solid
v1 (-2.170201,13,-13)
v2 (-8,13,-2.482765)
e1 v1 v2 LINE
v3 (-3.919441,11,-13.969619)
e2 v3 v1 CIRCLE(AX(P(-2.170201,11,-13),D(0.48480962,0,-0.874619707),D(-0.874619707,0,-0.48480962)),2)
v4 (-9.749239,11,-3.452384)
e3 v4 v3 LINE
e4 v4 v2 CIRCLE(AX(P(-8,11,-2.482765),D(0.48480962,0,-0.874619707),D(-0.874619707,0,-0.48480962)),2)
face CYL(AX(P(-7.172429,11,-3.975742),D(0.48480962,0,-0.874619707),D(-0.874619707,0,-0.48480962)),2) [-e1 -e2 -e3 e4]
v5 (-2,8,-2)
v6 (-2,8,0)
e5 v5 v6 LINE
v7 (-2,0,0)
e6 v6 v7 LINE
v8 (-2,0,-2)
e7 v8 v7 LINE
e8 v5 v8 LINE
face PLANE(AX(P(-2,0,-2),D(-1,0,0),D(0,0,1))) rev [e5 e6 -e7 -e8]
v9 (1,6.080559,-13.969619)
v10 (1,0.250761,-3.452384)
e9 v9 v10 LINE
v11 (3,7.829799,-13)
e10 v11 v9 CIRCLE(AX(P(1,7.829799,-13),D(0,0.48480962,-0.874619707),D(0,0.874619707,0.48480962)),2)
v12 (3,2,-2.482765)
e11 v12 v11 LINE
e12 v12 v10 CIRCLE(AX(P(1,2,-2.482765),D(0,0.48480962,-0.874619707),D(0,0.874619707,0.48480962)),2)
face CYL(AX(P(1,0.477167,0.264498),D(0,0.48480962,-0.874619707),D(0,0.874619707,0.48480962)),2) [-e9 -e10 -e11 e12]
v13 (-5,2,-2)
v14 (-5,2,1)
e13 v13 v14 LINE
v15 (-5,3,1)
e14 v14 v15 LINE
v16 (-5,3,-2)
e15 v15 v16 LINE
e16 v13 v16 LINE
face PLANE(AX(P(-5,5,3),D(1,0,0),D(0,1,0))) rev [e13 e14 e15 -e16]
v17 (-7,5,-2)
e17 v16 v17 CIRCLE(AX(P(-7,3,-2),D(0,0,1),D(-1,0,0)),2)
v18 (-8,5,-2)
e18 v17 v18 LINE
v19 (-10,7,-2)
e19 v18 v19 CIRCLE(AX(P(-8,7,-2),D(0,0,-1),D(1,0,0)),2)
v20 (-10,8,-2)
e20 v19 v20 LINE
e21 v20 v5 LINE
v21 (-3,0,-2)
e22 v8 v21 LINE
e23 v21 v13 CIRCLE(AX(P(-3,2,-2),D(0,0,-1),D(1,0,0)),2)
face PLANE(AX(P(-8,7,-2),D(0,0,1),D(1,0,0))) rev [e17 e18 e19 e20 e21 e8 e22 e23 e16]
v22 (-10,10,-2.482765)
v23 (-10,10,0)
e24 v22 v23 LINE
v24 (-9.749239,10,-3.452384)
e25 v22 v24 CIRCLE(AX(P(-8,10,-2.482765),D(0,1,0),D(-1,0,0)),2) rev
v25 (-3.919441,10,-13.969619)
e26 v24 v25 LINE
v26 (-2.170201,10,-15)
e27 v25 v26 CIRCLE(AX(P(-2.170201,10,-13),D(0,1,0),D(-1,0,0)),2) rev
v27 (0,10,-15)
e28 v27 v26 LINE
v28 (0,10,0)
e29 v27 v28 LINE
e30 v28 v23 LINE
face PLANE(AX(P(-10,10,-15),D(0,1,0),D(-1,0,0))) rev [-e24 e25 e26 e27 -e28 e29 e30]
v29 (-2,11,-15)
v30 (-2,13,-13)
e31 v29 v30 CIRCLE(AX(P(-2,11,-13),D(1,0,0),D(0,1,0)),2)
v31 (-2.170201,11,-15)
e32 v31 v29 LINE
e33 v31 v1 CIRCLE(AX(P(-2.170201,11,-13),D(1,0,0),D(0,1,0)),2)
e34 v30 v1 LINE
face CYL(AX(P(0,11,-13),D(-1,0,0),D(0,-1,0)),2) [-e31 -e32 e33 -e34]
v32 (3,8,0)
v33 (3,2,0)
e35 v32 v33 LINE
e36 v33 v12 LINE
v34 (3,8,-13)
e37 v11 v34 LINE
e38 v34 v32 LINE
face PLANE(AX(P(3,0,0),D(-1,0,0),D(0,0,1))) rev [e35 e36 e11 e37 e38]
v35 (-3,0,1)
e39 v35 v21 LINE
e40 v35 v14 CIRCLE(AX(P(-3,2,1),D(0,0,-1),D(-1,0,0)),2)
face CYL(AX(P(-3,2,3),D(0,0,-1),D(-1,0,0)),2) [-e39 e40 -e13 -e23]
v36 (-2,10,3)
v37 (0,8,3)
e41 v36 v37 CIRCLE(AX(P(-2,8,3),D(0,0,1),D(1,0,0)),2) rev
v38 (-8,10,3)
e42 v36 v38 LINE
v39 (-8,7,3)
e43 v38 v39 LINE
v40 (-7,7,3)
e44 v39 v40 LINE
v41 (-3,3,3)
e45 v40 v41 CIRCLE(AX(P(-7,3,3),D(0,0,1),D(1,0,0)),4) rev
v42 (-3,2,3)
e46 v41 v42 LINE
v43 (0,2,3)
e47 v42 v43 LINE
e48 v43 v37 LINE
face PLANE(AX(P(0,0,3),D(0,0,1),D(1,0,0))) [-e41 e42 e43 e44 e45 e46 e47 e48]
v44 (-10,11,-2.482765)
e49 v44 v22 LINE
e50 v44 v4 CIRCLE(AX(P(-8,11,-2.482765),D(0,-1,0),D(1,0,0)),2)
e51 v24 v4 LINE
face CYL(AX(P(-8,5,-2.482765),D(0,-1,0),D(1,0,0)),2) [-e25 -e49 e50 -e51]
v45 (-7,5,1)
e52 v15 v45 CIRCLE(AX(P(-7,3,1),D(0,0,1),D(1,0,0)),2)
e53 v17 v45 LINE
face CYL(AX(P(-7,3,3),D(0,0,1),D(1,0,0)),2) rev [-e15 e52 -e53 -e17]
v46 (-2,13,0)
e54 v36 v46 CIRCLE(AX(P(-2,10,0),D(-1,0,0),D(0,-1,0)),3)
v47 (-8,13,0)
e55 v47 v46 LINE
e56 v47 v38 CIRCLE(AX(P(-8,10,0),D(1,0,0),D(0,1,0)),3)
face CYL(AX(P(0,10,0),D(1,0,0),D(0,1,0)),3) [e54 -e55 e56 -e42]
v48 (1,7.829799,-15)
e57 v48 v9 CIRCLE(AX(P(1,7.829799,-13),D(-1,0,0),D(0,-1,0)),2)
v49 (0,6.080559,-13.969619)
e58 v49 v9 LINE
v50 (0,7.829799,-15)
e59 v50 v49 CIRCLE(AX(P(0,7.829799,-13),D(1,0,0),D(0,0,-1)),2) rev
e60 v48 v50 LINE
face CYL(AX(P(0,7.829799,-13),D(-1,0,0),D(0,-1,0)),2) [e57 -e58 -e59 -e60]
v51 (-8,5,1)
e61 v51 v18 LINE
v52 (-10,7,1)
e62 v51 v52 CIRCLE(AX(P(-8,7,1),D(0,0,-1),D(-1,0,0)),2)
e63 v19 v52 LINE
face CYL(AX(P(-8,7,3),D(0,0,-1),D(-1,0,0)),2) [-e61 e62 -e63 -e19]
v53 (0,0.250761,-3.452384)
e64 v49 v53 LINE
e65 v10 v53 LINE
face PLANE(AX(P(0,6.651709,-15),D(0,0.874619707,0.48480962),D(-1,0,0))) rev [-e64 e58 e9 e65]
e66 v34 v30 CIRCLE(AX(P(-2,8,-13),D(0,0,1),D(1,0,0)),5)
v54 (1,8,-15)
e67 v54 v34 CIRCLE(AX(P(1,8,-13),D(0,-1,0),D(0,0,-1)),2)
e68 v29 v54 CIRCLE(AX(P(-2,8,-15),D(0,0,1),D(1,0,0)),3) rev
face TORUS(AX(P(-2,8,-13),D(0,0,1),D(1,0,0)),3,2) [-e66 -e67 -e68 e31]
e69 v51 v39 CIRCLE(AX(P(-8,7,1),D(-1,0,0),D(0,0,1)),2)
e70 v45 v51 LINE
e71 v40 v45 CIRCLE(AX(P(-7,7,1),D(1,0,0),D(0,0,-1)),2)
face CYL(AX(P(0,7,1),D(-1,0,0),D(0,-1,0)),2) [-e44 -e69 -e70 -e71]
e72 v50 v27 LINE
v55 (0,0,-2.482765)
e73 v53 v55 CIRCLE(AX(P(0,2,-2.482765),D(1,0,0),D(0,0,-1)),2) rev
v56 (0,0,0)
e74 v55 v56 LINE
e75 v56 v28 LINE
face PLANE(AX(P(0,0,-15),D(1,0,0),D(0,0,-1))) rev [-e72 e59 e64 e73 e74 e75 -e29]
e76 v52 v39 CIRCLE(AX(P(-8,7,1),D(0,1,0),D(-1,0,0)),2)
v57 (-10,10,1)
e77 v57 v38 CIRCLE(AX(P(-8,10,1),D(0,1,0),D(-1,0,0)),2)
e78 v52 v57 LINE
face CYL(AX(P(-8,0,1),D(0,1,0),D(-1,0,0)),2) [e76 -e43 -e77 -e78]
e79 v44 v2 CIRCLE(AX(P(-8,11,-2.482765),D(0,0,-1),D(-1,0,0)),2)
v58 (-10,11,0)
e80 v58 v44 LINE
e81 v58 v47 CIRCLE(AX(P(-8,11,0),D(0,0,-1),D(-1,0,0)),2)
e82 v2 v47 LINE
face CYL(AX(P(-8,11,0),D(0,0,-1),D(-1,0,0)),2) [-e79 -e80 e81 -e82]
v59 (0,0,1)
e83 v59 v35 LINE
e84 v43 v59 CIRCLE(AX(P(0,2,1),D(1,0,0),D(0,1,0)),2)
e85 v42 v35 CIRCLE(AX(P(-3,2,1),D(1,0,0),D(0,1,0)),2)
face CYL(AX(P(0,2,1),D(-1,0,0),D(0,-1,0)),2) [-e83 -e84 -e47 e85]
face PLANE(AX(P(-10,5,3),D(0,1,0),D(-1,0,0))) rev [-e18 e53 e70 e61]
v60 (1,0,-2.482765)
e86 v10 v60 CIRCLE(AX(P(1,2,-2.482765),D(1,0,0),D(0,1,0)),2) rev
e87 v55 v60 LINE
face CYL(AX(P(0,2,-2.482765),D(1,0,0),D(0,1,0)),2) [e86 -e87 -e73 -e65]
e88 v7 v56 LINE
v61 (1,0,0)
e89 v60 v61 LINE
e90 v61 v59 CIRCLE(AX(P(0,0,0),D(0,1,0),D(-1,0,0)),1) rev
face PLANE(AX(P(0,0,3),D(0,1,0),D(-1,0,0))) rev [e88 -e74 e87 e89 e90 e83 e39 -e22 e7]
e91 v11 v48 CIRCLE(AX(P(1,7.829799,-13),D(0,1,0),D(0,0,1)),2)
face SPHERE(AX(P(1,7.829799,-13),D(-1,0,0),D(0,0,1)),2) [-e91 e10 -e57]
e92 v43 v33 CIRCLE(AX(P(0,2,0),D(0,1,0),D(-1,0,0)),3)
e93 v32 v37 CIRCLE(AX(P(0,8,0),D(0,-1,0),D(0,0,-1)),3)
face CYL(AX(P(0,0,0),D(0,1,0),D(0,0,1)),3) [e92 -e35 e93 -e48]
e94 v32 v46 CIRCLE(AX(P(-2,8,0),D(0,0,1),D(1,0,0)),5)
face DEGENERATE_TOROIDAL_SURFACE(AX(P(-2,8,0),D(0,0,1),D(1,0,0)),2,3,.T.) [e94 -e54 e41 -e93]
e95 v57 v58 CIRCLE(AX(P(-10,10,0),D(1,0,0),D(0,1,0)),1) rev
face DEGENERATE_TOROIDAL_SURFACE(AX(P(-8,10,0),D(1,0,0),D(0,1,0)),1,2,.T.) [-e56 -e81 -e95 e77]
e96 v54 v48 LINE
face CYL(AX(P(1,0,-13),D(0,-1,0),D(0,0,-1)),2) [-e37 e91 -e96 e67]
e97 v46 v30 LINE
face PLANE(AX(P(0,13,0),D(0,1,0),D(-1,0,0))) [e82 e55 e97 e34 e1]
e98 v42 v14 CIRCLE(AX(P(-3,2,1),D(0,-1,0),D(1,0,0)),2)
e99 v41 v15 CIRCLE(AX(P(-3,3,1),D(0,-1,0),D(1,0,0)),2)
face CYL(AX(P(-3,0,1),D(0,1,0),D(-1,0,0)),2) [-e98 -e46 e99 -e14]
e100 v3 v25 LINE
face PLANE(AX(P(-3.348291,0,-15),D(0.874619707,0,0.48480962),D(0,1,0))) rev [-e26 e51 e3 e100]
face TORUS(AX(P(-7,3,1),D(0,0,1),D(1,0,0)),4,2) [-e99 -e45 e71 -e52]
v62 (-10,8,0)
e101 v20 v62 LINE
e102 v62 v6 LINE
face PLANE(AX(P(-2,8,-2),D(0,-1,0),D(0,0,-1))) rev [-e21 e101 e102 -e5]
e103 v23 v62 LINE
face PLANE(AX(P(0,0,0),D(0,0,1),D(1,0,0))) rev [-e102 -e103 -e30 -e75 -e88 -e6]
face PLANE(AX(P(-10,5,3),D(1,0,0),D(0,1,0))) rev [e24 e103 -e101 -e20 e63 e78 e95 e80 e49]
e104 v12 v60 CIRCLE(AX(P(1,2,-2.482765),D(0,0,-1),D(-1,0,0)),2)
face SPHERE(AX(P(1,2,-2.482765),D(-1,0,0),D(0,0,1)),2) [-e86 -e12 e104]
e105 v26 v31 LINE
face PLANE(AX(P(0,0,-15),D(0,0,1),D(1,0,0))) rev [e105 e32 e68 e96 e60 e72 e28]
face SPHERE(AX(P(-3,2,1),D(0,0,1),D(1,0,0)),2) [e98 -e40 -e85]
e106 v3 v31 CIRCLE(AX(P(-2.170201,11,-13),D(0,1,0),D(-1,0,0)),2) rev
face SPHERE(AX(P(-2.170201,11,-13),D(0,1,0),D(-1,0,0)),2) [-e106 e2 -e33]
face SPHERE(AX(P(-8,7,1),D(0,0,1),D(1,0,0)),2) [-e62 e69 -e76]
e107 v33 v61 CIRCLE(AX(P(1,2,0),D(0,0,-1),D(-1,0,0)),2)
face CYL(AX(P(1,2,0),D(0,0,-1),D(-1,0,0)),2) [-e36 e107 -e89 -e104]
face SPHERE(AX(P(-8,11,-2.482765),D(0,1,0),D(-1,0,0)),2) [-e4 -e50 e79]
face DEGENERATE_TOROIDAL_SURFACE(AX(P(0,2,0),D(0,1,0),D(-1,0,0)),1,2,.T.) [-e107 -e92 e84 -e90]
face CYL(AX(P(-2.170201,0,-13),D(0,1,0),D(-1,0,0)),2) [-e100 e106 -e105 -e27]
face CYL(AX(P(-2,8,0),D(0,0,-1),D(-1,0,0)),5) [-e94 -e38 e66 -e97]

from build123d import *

# Parameters (mm, degrees)
BOSS_EXTRUDE1_DEPTH = 3
SKETCH2_W           = 10
SKETCH2_H           = 3
BOSS_EXTRUDE2_DEPTH = 3
SKETCH3_W           = 3
SKETCH3_H           = 13
BOSS_EXTRUDE3_DEPTH = 3
BOSS_EXTRUDE4_DEPTH = 15
FILLET1_R           = 3
FILLET2_R           = 2
CHAMFER1_SIZE       = 12
CHAMFER1_SIZE2      = 6.651708617
FILLET3_R           = 2
CHAMFER2_SIZE       = 12
CHAMFER2_SIZE2      = 6.651708617
FILLET4_R           = 2
FILLET5_R           = 5
FILLET7_R           = 2
BOSS_EXTRUDE5_DEPTH = 2


with BuildPart() as part:
    # Sketch1 → Boss-Extrude1 (new body)
    with BuildSketch(Plane.XY):
        Polygon((-10, 5), (-5, 5), (-5, 0), (0, 0), (0, 10), (-10, 10), align=None)
    extrude(amount=BOSS_EXTRUDE1_DEPTH)

    # Sketch2 → Boss-Extrude2 (add)
    with BuildSketch(Plane(origin=(0, 10, 0), x_dir=(1, 0, 0), z_dir=(0, 1, 0))):
        with Locations((-5, -1.5)):
            Rectangle(SKETCH2_W, SKETCH2_H)
    extrude(amount=BOSS_EXTRUDE2_DEPTH)

    # Sketch3 → Boss-Extrude3 (add)
    with BuildSketch(Plane(origin=(0, 0, 0), x_dir=(0, 0, -1), z_dir=(1, 0, 0))):
        with Locations((-1.5, 6.5)):
            Rectangle(SKETCH3_W, SKETCH3_H)
    extrude(amount=BOSS_EXTRUDE3_DEPTH)

    # Sketch4 → Boss-Extrude4 (add)
    with BuildSketch(Plane(origin=(0, 0, 0), x_dir=(-1, 0, 0), z_dir=(0, 0, -1))):
        Polygon((10, 13), (-3, 13), (-3, 9.459168036), (-3, 0), (0, 0), (0, 10), (10, 10), align=None)
    extrude(amount=BOSS_EXTRUDE4_DEPTH)

    # Fillet1
    fillet1_edges = [part.edges().sort_by_distance(p)[0] for p in [
        (-3.5, 13, 3),
        (3, 6.5, 3),
    ]]
    fillet(fillet1_edges, radius=FILLET1_R)

    # Fillet2
    fillet2_edges = [part.edges().sort_by_distance(p)[0] for p in [
        (-5, 5, 1.5),
        (-10, 5, 1.5),
        (-5, 0, 1.5),
    ]]
    fillet(fillet2_edges, radius=FILLET2_R)

    # Chamfer1
    chamfer1_edges = [part.edges().sort_by_distance(p)[0] for p in [
        (-10, 11.5, -15),
    ]]
    chamfer1_side = [part.faces().sort_by_distance(p)[0] for p in [
        (-10, 11.031627007, -5.158135036),
    ]]
    chamfer(chamfer1_edges, length=CHAMFER1_SIZE, length2=CHAMFER1_SIZE2, reference=chamfer1_side[0])

    # Fillet3
    fillet3_edges = [part.edges().sort_by_distance(p)[0] for p in [
        (-3.348291383, 11.5, -15),
        (-10, 11.5, -3),
    ]]
    fillet(fillet3_edges, radius=FILLET3_R)

    # Chamfer2
    chamfer2_edges = [part.edges().sort_by_distance(p)[0] for p in [
        (1.5, 0, -15),
    ]]
    chamfer2_side = [part.faces().sort_by_distance(p)[0] for p in [
        (1.031627007, 0, -5.158135036),
    ]]
    chamfer(chamfer2_edges, length=CHAMFER2_SIZE, length2=CHAMFER2_SIZE2, reference=chamfer2_side[0])

    # Fillet4
    fillet4_edges = [part.edges().sort_by_distance(p)[0] for p in [
        (1.5, 6.651708617, -15),
        (1.5, 0, -3),
    ]]
    fillet(fillet4_edges, radius=FILLET4_R)

    # Fillet5
    # the kernel refuses this fillet: 5 mm, written as the material it takes off along each edge
    with BuildSketch(Plane(origin=(-2, 8, 3), x_dir=(1, 0, 0), z_dir=(0, -1, 0))) as fillet5_piece_1:
        with BuildLine():
            CenterArc((2, -3), 3, 0, 90)
            Line((5, -3), (5, 0))
            Line((5, 0), (2, 0))
        make_face()
    revolve(axis=Axis((-2, 8, 3), (0, 0, 1)), revolution_arc=90, mode=Mode.SUBTRACT)
    with BuildSketch(Plane(origin=(3, 13, 3), x_dir=(0, -1, 0), z_dir=(0, 0, -1))) as fillet5_piece_2:
        with BuildLine():
            CenterArc((FILLET5_R, FILLET5_R), FILLET5_R, 180, 90)
            Line((0, FILLET5_R), (0, 0))
            Line((0, 0), (FILLET5_R, 0))
        make_face()
    extrude(amount=30.5, mode=Mode.SUBTRACT)

    # Fillet7
    fillet7_edges = [part.edges().sort_by_distance(p)[0] for p in [
        (-2.085100675, 13, -15),
        (-6.834340089, 13, -8.711001656),
        (-10, 13, -1.241382416),
        (-9.936295281, 13, -2.983524839),
        (-3.185278076, 13, -14.723258321),
        (3, 3.165659911, -8.711001656),
        (3, 0.063704719, -2.983524839),
        (3, 6.814721924, -14.723258321),
        (3, 7.914899325, -15),
        (1.535533906, 11.535533906, -15),
        (3, 0, -1.241382416),
        (2.121320344, 0, 2.121320344),
        (-10, 8.5, 3),
        (-10, 12.121320344, 2.121320344),
        (-5, 2.5, 3),
        (-7.5, 5, 3),
        (-1.5, 0, 3),
        (-4.414213562, 0.585786438, 3),
        (-9.414213562, 5.585786438, 3),
        (-5.585786438, 4.414213562, 3),
    ]]
    fillet(fillet7_edges, radius=FILLET7_R)

    # Sketch5 → Boss-Extrude5 (add)
    with BuildSketch(Plane(origin=(0, 0, 0), x_dir=(-1, 0, 0), z_dir=(0, 0, -1))):
        with BuildLine():
            Line((10, 8), (10, 7))
            ThreePointArc((10, 7), (9.414213562, 5.585786438), (8, 5))
            Line((8, 5), (7, 5))
            ThreePointArc((7, 5), (5.585786438, 4.414213562), (5, 3))
            Line((5, 3), (5, 2))
            ThreePointArc((5, 2), (4.414213562, 0.585786438), (3, 0))
            Line((3, 0), (2, 0))
            Line((2, 0), (2, 8))
            Line((2, 8), (10, 8))
        make_face()
    extrude(amount=BOSS_EXTRUDE5_DEPTH)


solid = part.part
